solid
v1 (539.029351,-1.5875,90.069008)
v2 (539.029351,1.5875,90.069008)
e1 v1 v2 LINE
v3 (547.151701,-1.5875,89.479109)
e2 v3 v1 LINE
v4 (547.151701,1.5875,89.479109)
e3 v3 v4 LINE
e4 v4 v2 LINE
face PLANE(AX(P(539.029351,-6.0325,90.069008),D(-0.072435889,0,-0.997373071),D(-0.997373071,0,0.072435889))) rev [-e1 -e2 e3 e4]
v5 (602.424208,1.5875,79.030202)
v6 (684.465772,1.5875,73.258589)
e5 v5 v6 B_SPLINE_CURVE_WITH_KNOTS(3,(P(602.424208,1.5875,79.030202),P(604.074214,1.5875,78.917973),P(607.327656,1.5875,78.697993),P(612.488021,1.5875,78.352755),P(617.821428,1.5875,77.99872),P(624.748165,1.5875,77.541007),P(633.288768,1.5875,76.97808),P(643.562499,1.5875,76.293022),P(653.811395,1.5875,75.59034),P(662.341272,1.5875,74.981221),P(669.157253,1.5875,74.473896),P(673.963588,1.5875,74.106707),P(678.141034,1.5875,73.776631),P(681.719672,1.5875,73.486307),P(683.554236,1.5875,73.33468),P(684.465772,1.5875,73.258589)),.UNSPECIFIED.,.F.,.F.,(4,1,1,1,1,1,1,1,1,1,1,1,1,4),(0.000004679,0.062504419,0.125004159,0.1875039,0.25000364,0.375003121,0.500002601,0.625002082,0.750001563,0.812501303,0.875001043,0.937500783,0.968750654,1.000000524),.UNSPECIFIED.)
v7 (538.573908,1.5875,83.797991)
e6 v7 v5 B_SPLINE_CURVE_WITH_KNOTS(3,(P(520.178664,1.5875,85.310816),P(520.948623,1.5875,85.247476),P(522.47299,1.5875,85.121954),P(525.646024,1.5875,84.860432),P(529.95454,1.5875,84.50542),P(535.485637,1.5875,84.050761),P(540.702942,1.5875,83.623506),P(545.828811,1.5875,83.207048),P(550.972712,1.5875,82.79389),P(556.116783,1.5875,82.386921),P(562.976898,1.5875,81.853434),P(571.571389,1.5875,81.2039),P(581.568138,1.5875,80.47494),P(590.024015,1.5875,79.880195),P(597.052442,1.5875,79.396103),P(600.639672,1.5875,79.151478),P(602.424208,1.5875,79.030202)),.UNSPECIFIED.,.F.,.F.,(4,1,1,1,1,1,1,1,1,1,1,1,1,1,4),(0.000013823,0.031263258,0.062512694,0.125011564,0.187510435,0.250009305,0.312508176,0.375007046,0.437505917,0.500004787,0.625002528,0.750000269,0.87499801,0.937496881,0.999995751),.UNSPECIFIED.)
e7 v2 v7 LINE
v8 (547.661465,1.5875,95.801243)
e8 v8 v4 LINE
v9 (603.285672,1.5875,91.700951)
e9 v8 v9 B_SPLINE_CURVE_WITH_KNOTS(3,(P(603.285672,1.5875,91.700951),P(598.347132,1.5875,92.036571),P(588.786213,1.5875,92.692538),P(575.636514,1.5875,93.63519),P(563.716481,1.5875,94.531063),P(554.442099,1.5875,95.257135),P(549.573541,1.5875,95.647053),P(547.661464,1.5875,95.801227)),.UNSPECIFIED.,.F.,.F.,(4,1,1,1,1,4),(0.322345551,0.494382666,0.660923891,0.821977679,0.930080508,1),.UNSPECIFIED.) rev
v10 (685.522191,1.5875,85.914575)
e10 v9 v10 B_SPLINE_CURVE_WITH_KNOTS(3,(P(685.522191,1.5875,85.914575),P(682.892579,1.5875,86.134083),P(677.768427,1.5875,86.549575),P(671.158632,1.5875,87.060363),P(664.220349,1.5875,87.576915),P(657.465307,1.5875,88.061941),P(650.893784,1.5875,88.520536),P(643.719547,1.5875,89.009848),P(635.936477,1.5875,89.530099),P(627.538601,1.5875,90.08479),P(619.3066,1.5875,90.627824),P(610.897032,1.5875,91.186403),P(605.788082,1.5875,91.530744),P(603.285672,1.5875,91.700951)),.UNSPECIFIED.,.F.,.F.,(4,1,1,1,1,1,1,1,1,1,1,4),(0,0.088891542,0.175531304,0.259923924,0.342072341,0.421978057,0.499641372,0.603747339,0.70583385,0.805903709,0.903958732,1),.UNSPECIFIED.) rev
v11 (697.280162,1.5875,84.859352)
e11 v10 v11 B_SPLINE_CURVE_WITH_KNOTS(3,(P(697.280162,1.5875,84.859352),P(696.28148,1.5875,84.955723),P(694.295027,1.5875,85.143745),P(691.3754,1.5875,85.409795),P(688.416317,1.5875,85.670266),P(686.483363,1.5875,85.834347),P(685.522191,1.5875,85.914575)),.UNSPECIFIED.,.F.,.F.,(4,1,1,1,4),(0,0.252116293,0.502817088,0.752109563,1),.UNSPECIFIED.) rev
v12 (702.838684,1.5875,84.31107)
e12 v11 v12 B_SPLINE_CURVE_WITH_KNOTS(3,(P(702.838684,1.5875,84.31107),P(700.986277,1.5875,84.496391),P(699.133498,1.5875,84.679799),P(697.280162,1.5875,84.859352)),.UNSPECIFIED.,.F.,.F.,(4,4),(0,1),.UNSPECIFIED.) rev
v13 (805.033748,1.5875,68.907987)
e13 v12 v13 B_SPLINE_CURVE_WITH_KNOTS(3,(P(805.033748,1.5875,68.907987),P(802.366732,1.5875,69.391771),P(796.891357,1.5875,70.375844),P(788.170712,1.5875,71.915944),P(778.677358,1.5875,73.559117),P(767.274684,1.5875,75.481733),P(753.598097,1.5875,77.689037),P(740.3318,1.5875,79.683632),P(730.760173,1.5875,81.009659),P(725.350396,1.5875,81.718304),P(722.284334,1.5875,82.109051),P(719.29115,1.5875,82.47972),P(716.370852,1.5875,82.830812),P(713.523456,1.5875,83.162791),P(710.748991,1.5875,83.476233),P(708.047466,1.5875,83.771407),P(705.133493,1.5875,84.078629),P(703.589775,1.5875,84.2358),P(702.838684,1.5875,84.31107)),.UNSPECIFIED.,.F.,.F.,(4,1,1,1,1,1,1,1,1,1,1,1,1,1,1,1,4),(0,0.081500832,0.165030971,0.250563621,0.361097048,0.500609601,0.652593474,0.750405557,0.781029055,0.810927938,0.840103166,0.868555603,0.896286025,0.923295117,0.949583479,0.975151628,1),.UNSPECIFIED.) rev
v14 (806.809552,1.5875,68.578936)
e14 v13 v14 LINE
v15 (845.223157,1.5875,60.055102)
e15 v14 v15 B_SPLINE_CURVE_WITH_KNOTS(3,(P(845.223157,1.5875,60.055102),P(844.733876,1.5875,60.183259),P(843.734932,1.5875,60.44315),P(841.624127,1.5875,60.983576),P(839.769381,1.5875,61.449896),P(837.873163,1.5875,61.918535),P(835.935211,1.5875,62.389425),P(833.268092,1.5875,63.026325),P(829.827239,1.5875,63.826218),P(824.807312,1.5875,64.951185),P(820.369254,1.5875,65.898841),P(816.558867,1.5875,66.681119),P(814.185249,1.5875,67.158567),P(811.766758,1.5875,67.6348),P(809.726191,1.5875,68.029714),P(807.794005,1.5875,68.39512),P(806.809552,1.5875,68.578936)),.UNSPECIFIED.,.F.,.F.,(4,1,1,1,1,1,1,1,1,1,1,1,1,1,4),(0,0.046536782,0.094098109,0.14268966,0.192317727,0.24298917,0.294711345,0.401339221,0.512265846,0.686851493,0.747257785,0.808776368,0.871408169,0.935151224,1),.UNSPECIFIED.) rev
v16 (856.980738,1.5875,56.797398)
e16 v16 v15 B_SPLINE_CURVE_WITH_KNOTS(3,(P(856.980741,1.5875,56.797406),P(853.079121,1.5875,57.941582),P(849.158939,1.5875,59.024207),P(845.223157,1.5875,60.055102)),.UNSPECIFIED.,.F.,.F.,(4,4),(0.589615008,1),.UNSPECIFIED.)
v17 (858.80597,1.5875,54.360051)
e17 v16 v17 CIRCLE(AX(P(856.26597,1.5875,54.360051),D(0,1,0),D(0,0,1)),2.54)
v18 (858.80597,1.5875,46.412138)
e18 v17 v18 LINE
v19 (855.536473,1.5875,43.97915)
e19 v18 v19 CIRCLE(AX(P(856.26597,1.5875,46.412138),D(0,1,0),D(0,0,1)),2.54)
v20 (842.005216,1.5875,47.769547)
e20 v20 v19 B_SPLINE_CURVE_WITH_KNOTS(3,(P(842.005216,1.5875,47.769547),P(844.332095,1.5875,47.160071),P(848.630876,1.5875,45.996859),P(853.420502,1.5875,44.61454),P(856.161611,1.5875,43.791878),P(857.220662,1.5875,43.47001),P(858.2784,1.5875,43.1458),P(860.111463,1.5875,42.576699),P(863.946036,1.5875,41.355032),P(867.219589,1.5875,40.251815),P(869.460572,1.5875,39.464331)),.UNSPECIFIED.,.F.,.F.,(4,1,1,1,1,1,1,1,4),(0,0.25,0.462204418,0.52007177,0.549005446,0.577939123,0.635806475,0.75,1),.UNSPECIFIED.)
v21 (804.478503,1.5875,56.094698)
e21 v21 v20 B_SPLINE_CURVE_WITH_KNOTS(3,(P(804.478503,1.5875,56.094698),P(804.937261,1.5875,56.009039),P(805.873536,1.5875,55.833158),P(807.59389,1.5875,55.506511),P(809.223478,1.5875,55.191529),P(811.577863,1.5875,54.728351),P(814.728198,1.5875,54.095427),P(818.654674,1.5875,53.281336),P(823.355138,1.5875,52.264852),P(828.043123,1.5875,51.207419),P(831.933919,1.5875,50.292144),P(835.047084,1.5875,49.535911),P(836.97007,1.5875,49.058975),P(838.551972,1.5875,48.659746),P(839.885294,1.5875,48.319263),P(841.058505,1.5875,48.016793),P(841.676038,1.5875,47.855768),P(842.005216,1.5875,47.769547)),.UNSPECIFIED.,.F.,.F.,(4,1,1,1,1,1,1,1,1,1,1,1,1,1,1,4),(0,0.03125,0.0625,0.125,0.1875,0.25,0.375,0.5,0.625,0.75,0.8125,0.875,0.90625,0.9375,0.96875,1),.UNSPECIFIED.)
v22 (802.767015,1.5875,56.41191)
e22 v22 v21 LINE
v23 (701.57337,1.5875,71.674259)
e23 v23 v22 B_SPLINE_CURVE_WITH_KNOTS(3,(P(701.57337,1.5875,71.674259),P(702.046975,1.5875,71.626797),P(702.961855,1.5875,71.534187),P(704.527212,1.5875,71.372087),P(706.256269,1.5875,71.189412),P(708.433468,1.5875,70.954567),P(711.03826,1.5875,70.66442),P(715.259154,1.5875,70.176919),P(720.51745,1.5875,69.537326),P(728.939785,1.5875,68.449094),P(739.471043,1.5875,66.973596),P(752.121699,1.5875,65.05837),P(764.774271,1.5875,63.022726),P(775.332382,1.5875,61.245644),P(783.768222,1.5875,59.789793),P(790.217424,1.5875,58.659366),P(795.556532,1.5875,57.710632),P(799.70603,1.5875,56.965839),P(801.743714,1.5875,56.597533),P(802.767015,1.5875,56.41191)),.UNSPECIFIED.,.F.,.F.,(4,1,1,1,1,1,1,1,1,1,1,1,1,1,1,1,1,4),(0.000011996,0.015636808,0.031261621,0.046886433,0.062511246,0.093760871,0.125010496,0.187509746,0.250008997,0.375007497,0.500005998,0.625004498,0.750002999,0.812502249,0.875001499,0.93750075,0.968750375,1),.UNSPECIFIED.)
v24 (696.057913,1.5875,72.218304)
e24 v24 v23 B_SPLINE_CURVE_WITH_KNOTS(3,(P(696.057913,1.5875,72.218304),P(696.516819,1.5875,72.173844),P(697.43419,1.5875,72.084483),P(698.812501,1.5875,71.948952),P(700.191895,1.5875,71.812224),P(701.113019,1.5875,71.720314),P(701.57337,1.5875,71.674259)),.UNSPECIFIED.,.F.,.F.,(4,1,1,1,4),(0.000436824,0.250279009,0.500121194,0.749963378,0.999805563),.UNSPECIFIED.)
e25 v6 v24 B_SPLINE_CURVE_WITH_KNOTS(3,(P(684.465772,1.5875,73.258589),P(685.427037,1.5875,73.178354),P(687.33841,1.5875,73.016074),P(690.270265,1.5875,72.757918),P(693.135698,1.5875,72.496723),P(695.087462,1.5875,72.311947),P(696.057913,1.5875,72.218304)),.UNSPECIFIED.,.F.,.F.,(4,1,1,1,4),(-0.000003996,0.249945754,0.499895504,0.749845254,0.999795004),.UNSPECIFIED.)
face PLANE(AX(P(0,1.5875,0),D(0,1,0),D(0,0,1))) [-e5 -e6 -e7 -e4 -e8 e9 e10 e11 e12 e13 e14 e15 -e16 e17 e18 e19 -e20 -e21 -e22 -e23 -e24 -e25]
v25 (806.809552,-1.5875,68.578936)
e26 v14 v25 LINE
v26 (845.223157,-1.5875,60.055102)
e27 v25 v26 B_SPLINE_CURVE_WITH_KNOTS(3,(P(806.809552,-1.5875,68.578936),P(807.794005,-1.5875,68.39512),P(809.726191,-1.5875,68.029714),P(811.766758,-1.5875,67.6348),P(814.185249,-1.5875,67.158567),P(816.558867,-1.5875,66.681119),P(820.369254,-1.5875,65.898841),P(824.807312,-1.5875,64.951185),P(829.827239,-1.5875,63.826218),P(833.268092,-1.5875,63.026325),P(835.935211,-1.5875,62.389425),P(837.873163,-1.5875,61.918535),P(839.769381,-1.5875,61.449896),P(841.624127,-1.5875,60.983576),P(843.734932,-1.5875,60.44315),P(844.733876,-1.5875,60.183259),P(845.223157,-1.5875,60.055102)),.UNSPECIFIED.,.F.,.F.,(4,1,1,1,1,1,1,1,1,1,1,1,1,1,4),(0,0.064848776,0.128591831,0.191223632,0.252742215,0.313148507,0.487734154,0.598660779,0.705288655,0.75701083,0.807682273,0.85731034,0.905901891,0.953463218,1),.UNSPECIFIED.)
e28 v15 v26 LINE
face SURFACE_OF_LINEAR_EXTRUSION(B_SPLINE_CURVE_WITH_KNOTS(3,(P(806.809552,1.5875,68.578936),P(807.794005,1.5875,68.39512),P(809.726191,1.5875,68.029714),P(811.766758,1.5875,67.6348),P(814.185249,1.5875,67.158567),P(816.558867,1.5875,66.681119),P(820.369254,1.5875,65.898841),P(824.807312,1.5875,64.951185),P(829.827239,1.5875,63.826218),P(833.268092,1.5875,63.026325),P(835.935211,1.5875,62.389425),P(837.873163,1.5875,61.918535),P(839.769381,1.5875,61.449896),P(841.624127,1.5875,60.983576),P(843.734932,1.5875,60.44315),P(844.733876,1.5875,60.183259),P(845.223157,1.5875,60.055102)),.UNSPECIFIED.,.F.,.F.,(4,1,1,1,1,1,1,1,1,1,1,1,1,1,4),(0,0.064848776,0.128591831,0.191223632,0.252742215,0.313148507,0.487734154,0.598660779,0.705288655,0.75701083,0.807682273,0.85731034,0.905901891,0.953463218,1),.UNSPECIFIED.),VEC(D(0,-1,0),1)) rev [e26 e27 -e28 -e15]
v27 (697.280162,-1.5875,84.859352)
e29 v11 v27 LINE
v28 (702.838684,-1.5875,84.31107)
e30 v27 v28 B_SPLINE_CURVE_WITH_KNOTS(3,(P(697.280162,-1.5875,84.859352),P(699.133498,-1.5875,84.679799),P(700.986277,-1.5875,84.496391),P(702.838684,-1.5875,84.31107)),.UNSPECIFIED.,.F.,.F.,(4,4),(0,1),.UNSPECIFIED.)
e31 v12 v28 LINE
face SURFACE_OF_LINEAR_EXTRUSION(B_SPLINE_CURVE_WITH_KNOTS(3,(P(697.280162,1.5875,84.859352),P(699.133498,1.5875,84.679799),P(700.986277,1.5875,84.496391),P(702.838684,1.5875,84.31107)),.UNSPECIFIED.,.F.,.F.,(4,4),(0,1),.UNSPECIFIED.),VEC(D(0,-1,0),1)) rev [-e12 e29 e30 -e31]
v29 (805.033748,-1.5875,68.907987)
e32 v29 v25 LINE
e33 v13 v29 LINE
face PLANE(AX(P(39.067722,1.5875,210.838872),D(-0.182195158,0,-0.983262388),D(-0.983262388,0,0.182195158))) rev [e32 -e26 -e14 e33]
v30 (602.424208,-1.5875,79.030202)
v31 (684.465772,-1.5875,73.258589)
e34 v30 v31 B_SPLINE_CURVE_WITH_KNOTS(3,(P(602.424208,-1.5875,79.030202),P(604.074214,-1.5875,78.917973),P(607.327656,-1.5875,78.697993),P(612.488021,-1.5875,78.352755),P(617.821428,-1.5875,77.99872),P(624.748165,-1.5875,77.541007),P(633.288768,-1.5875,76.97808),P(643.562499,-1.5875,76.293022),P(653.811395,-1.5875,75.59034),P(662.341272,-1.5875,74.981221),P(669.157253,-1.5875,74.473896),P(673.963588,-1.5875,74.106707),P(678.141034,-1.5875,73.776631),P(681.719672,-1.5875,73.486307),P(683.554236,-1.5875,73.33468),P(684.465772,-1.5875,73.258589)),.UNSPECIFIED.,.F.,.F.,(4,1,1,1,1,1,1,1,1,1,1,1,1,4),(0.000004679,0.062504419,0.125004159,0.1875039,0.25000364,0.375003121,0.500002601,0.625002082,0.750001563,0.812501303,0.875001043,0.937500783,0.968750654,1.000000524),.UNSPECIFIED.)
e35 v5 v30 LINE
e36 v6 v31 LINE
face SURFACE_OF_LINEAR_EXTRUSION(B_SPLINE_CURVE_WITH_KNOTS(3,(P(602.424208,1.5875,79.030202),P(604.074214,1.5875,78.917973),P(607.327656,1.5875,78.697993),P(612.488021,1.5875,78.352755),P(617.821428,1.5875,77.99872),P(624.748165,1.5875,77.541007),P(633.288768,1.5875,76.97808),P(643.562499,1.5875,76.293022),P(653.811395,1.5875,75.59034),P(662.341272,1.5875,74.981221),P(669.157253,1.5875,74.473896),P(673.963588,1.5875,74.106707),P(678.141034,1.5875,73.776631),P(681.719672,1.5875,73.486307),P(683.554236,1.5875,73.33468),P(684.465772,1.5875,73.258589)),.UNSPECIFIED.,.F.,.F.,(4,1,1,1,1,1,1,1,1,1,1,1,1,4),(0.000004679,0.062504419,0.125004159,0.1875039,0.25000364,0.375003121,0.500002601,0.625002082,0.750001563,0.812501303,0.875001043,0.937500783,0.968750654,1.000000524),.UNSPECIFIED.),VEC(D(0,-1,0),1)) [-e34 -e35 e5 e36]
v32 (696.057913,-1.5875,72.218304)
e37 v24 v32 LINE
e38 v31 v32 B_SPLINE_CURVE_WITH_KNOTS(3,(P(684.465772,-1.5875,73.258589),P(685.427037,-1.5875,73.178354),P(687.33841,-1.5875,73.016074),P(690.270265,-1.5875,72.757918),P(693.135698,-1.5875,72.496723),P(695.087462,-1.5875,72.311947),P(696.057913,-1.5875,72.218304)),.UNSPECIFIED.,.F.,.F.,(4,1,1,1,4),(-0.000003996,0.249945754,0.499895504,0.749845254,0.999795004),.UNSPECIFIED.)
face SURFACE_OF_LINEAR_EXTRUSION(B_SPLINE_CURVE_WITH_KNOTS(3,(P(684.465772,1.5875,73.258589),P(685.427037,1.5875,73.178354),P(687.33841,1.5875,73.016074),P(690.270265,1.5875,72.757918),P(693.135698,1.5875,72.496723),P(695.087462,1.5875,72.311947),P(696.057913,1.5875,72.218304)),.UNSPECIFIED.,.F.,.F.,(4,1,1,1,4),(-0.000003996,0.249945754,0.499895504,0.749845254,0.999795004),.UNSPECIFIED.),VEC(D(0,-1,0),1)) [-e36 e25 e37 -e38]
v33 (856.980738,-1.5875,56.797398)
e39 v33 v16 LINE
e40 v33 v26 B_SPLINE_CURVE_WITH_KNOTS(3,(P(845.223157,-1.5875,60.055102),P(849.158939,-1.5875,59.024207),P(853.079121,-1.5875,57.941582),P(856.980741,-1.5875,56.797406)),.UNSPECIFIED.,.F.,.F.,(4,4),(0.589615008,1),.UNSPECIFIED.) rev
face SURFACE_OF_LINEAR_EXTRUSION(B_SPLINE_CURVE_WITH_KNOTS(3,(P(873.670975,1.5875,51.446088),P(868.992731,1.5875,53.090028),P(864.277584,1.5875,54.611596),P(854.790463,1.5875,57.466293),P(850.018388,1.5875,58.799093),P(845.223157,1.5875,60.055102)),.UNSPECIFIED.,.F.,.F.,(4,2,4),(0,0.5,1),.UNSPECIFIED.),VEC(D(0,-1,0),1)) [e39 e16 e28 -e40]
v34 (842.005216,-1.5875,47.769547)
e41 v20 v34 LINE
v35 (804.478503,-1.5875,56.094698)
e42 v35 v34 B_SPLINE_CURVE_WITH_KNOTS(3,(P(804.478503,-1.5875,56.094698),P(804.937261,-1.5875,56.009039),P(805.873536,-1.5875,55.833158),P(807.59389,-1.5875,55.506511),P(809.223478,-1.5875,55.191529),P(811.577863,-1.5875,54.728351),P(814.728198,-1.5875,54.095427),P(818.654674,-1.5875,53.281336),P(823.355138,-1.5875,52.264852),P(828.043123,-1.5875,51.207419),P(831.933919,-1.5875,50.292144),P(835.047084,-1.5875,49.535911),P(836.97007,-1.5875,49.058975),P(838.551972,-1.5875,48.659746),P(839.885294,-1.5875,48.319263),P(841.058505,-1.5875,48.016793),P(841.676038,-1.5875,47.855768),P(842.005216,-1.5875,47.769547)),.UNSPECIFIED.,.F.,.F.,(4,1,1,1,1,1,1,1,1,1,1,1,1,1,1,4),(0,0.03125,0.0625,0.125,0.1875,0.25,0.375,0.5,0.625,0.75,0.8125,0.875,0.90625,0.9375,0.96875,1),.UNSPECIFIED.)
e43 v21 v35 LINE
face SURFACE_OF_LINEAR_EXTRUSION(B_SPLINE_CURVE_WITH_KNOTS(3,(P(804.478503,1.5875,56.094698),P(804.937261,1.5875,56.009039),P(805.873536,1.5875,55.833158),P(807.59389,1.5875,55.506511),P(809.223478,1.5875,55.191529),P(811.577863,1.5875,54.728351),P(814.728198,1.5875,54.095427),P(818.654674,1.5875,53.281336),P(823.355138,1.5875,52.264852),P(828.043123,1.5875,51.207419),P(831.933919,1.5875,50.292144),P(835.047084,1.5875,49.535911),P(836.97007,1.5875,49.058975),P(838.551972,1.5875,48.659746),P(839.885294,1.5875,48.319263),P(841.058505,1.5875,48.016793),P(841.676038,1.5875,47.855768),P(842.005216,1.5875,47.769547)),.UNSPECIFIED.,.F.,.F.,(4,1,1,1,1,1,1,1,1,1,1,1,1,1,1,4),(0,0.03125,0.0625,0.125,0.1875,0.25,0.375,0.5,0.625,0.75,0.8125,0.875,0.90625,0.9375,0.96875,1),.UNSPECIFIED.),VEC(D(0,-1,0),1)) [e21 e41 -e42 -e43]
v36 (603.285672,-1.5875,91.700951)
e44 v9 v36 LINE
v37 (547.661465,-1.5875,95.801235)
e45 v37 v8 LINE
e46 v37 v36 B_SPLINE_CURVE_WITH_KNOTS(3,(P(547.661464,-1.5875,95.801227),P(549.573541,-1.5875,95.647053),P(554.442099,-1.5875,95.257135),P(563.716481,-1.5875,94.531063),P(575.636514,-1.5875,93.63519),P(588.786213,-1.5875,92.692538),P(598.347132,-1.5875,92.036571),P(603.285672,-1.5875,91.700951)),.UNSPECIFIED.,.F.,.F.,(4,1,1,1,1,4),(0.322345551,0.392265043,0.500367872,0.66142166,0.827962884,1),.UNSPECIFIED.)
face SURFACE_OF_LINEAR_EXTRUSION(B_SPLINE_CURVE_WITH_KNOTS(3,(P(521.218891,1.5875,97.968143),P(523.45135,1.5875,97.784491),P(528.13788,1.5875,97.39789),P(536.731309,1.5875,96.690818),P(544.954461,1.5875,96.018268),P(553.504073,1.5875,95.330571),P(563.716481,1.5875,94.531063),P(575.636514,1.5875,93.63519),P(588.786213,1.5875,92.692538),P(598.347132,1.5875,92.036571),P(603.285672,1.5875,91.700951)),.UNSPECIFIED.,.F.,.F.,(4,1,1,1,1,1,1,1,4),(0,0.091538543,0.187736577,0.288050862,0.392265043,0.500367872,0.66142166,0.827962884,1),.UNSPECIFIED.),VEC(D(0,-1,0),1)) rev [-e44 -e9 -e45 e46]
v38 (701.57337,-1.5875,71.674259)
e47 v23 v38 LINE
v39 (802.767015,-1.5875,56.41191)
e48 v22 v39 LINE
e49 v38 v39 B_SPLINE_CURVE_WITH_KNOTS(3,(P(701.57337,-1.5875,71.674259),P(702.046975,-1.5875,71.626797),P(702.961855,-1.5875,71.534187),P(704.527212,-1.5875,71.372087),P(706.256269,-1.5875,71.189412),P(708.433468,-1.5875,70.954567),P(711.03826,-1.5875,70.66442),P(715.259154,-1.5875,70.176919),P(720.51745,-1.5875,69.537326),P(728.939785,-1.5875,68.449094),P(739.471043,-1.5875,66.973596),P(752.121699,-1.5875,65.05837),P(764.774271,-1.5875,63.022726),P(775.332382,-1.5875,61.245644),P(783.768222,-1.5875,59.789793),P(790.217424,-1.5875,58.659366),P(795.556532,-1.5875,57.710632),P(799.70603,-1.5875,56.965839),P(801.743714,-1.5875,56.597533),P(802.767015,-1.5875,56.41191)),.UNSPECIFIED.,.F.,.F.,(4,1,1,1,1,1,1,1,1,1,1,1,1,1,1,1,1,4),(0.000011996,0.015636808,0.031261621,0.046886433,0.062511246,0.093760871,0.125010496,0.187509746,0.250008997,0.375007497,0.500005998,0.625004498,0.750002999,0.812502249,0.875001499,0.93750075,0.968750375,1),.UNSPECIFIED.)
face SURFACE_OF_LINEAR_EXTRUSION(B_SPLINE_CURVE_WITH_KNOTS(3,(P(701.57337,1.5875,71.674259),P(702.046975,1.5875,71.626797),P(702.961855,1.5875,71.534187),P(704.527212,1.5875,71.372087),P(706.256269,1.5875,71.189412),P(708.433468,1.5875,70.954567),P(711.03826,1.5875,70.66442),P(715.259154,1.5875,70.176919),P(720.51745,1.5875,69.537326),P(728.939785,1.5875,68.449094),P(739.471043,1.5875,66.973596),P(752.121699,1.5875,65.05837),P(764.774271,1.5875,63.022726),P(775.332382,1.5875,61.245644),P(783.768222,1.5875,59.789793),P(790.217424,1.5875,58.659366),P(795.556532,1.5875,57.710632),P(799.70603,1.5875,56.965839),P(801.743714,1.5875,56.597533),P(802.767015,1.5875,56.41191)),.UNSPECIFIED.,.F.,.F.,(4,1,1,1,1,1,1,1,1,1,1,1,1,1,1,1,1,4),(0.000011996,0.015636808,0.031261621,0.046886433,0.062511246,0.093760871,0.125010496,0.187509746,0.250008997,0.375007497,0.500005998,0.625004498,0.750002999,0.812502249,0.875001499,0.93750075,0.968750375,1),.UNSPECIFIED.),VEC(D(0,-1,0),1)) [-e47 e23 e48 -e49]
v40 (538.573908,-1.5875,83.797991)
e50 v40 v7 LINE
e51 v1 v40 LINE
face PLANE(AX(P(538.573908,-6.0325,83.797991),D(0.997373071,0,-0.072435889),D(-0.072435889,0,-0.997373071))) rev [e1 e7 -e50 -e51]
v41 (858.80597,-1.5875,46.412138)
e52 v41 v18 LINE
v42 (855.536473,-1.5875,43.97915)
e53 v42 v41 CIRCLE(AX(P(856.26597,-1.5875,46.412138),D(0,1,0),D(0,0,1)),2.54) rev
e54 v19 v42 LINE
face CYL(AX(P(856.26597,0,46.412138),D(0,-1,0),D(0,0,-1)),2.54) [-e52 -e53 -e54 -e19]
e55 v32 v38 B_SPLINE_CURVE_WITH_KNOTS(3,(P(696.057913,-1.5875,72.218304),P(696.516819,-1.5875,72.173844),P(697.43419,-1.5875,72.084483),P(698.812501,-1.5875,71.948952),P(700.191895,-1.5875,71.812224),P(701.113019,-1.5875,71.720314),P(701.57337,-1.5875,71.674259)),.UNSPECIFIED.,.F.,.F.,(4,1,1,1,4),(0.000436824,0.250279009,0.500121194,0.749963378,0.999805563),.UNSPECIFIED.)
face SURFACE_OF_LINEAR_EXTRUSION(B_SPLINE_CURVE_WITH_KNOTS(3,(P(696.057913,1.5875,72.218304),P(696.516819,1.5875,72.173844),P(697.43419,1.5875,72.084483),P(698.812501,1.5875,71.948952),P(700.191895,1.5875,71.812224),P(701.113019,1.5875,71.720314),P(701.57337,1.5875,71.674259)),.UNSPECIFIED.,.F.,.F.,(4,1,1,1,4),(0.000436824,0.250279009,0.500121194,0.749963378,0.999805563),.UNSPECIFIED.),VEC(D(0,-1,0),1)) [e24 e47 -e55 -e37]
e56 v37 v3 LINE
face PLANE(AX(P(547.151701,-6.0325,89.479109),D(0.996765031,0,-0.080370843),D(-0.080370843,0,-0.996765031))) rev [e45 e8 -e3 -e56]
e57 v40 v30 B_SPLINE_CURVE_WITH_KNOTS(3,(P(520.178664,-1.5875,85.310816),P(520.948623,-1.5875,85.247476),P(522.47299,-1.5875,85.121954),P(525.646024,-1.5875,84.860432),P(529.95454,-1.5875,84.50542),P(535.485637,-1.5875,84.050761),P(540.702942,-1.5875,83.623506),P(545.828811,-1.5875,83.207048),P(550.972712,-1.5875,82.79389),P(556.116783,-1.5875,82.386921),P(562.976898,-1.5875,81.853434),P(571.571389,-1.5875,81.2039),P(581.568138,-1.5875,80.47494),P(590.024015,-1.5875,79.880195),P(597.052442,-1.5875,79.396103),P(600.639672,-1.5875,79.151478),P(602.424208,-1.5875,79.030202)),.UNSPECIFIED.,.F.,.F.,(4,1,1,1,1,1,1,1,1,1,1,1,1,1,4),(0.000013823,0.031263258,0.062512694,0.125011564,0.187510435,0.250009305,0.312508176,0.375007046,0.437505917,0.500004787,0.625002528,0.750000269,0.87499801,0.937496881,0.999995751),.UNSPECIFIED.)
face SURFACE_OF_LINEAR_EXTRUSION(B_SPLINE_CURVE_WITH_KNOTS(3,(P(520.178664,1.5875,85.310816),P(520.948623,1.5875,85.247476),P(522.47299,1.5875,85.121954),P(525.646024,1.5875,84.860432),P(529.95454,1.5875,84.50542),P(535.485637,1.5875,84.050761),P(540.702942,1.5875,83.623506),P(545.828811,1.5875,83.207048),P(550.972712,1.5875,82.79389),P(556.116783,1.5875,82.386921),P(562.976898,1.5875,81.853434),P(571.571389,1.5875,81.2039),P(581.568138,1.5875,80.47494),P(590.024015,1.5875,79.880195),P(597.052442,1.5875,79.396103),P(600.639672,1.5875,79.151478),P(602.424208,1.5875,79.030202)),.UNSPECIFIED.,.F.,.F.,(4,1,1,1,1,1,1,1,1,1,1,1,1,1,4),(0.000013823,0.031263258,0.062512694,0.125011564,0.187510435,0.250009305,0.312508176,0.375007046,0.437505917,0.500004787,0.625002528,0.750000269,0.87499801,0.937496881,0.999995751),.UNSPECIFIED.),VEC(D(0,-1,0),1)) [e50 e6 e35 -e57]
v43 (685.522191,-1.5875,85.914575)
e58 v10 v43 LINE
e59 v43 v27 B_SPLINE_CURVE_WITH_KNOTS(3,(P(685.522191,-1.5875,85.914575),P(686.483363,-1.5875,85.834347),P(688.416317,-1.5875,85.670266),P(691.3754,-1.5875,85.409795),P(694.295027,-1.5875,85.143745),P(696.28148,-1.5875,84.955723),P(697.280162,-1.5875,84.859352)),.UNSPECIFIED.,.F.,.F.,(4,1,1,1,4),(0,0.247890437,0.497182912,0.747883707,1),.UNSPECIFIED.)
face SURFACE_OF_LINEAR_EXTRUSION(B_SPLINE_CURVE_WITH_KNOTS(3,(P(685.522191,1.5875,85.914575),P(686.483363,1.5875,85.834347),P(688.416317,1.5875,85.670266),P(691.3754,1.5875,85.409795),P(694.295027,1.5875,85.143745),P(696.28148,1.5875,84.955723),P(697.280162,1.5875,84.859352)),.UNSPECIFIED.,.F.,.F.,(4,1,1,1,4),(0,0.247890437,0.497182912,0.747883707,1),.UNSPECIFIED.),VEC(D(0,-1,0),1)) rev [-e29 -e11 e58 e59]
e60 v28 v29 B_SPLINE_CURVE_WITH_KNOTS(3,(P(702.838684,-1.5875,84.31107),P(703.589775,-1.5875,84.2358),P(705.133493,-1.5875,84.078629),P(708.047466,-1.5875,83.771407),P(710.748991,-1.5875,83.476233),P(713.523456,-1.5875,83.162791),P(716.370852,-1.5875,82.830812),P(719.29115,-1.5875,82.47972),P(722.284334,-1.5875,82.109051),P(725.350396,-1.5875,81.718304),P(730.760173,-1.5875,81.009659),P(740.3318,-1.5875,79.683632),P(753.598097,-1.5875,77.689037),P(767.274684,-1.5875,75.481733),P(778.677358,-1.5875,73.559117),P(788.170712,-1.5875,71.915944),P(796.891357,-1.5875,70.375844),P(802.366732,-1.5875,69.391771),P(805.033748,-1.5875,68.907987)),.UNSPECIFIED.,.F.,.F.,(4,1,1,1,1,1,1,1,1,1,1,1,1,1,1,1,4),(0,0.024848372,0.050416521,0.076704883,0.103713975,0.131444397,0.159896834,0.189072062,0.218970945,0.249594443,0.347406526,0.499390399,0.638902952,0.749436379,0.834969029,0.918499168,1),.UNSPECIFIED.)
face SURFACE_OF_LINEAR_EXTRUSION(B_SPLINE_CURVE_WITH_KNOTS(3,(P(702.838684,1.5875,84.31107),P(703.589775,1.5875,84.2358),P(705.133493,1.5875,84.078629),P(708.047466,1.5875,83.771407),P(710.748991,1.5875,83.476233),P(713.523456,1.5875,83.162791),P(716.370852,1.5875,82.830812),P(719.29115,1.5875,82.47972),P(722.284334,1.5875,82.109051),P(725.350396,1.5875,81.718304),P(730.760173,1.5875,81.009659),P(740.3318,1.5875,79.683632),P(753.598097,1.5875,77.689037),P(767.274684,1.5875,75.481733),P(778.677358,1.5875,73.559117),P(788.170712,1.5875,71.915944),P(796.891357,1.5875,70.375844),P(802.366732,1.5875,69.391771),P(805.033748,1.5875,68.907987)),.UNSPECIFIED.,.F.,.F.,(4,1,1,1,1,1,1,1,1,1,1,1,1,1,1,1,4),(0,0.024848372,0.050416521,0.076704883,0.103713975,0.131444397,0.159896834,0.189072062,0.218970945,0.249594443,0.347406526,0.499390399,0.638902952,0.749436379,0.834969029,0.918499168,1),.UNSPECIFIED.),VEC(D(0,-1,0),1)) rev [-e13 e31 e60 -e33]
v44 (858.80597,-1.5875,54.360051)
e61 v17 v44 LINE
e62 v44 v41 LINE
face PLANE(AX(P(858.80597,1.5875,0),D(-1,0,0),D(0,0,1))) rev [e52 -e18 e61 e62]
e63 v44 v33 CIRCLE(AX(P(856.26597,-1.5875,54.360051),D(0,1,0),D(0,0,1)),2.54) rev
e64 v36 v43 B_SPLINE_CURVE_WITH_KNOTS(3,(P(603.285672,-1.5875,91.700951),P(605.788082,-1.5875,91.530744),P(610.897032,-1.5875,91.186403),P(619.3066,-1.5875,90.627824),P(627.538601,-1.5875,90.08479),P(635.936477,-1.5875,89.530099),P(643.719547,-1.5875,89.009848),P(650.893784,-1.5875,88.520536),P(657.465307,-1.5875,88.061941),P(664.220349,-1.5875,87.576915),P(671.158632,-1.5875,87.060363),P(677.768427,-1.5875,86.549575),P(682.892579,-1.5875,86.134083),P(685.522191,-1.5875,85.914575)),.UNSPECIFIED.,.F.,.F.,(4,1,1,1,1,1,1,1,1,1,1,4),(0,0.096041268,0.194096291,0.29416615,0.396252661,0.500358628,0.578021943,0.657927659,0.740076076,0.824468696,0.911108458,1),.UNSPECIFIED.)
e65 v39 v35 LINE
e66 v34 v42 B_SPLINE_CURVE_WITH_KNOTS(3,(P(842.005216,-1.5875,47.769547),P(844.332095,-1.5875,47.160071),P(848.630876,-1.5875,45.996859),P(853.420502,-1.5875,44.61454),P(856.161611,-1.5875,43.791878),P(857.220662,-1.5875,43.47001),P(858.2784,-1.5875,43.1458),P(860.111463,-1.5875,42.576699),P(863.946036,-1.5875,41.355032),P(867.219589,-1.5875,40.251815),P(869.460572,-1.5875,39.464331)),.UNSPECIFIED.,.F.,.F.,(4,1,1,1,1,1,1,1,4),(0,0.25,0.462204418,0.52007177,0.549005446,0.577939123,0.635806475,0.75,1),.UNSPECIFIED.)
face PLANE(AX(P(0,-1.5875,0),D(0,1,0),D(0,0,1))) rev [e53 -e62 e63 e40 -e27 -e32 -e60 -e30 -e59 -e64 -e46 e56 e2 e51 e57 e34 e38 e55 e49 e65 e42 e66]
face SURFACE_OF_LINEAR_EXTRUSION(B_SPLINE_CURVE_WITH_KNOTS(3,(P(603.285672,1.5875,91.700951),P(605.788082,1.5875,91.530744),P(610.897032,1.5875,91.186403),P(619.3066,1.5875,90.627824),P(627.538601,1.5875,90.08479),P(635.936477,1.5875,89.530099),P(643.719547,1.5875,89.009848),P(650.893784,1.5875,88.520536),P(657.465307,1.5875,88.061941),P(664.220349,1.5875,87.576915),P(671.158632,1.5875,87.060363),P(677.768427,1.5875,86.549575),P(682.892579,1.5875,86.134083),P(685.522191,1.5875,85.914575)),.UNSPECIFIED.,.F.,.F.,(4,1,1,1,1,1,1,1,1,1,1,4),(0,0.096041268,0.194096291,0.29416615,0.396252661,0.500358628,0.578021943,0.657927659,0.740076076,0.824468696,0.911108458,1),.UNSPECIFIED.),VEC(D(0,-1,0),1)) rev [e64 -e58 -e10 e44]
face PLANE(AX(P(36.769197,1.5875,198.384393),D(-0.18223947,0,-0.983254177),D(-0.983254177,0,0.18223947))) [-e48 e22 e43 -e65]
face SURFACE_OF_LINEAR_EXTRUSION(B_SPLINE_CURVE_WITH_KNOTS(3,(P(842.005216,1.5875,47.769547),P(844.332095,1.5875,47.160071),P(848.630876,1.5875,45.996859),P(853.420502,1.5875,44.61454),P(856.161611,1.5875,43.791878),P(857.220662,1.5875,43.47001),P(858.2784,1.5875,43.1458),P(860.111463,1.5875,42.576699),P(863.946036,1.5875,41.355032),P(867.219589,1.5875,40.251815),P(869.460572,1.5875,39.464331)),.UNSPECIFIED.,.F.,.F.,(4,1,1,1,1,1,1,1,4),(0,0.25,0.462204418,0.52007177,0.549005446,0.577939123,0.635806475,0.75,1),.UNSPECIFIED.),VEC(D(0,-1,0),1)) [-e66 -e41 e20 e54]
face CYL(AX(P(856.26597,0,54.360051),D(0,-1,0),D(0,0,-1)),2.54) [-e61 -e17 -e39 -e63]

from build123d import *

# Parameters (mm, degrees)
BOSS_EXTRUDE1_START = -1.5875
BOSS_EXTRUDE1_DEPTH = 3.175
FILLET1_R           = 2.54
CUT_EXTRUDE1_DEPTH  = 7.62


# Read off the part's stored shape, not the designer's step: Boss-Extrude1
with BuildPart() as part:
    # Boss-Extrude1 outline → Boss-Extrude1 (new body)
    with BuildSketch(Plane(origin=(0, 0, 0), x_dir=(1, 0, 0), z_dir=(0, 1, 0)).offset(BOSS_EXTRUDE1_START)):
        with BuildLine():
            add(Edge.make_bspline(
                [(701.573370465, -71.674259434), (702.04697488, -71.626796619), (702.961854911, -71.534187022), (704.527211696, -71.372087014), (706.256268563, -71.189411511), (708.433468196, -70.954566837), (711.038260137, -70.66442021), (715.259153852, -70.176918919), (720.517449562, -69.537326192), (728.939784684, -68.449094171), (739.471043309, -66.973596397), (752.121699379, -65.058370184), (764.774270693, -63.022725712), (775.332382372, -61.245644149), (783.768221701, -59.789793136), (790.217423582, -58.659365862), (795.556531692, -57.710632329), (799.706029598, -56.965839367), (801.743713725, -56.597532565), (802.76701547, -56.411910209)],
                knots=[1.1996e-05, 1.1996e-05, 1.1996e-05, 1.1996e-05, 0.015636808, 0.031261621, 0.046886433, 0.062511246, 0.093760871, 0.125010496, 0.187509746, 0.250008997, 0.375007497, 0.500005998, 0.625004498, 0.750002999, 0.812502249, 0.875001499, 0.93750075, 0.968750375, 1, 1, 1, 1], degree=3))
            add(Edge.make_bspline(
                [(696.057912544, -72.218303811), (696.516819195, -72.173843609), (697.434189716, -72.08448281), (698.812500771, -71.948951554), (700.191895387, -71.812223809), (701.113019016, -71.720314305), (701.573370465, -71.674259434)],
                knots=[0.000436824, 0.000436824, 0.000436824, 0.000436824, 0.250279009, 0.500121194, 0.749963378, 0.999805563, 0.999805563, 0.999805563, 0.999805563], degree=3))
            add(Edge.make_bspline(
                [(684.465771861, -73.258588893), (685.427037387, -73.178353817), (687.338409796, -73.01607439), (690.270265001, -72.757917882), (693.135698373, -72.496722872), (695.087462196, -72.311946881), (696.057912544, -72.218303811)],
                knots=[-3.996e-06, -3.996e-06, -3.996e-06, -3.996e-06, 0.249945754, 0.499895504, 0.749845254, 0.999795004, 0.999795004, 0.999795004, 0.999795004], degree=3))
            add(Edge.make_bspline(
                [(602.42420841, -79.030202072), (604.074214061, -78.917973041), (607.327656264, -78.697993222), (612.488020924, -78.352754528), (617.82142797, -77.998720132), (624.748165187, -77.541006681), (633.288768179, -76.978079707), (643.562499486, -76.293021789), (653.811394813, -75.590339748), (662.341271598, -74.981221252), (669.157253218, -74.473896148), (673.963588211, -74.106706625), (678.141033863, -73.776630779), (681.719672317, -73.486306526), (683.554235836, -73.334679882), (684.465771861, -73.258588893)],
                knots=[4.679e-06, 4.679e-06, 4.679e-06, 4.679e-06, 0.062504419, 0.125004159, 0.1875039, 0.25000364, 0.375003121, 0.500002601, 0.625002082, 0.750001563, 0.812501303, 0.875001043, 0.937500783, 0.968750654, 1.000000524, 1.000000524, 1.000000524, 1.000000524], degree=3))
            add(Edge.make_bspline(
                [(520.17866376, -85.310815783), (520.948622537, -85.247475703), (522.472990474, -85.121954498), (525.646023872, -84.860432492), (529.954540392, -84.505420462), (535.485636827, -84.050761487), (540.7029418, -83.623505808), (545.828810606, -83.207047886), (550.972711882, -82.793890253), (556.116782859, -82.386921041), (562.976897794, -81.853433898), (571.571389273, -81.203899916), (581.568137842, -80.474939815), (590.024015055, -79.880194977), (597.052441707, -79.396103056), (600.639671821, -79.151478022), (602.42420841, -79.030202072)],
                knots=[1.3823e-05, 1.3823e-05, 1.3823e-05, 1.3823e-05, 0.031263258, 0.062512694, 0.125011564, 0.187510435, 0.250009305, 0.312508176, 0.375007046, 0.437505917, 0.500004787, 0.625002528, 0.750000269, 0.87499801, 0.937496881, 0.999995751, 0.999995751, 0.999995751, 0.999995751], degree=3))
            add(Edge.make_bspline(
                [(421.564796931, -90.347249187), (422.61109619, -90.324190198), (424.721066812, -90.275643156), (427.781390104, -90.199626606), (430.822063258, -90.118782847), (434.941029322, -90.002532976), (440.08484045, -89.844168641), (452.427619866, -89.421521336), (466.822115937, -88.804267378), (483.25535308, -87.910089241), (493.52068453, -87.276342604), (501.726177762, -86.718361924), (507.872215251, -86.275368153), (512.780927318, -85.902800926), (516.950869137, -85.573515025), (519.108912611, -85.398645627), (520.17866376, -85.310815783)],
                knots=[7.203e-06, 7.203e-06, 7.203e-06, 7.203e-06, 0.031256675, 0.062506146, 0.093755618, 0.125005089, 0.187504032, 0.250002975, 0.499998747, 0.624996633, 0.749994519, 0.812493462, 0.874992405, 0.937491348, 0.968740819, 0.999990291, 0.999990291, 0.999990291, 0.999990291], degree=3))
            add(Edge.make_bspline(
                [(346.714675087, -91.169822314), (347.184634959, -91.179549272), (348.149283989, -91.198362445), (349.881001429, -91.228640124), (351.370820969, -91.250109563), (353.638345707, -91.276445536), (356.741777131, -91.30289862), (360.603346067, -91.318288447), (365.253131479, -91.312388009), (369.910166762, -91.284169995), (376.135587827, -91.222367993), (383.937832745, -91.109503558), (391.757720532, -90.96544109), (398.23665113, -90.836219907), (403.230594411, -90.734014325), (408.182903858, -90.630969164), (412.914025095, -90.531986169), (416.611599734, -90.454119205), (419.474951766, -90.392792196), (420.864689854, -90.36259776), (421.564796931, -90.347249187)],
                knots=[1.1e-08, 1.1e-08, 1.1e-08, 1.1e-08, 0.015624829, 0.031249657, 0.062499315, 0.093748972, 0.12499863, 0.187497945, 0.24999726, 0.312496575, 0.37499589, 0.49999452, 0.62499315, 0.687492464, 0.749991779, 0.812491094, 0.874990409, 0.937489724, 0.968739382, 0.999989039, 0.999989039, 0.999989039, 0.999989039], degree=3))
            add(Edge.make_bspline(
                [(284.660180705, -86.02436228), (285.273667186, -86.114656759), (286.466569449, -86.288293963), (288.463107874, -86.571590524), (290.46491743, -86.848444068), (293.02699573, -87.19252046), (296.252166304, -87.606710304), (301.400962421, -88.226261718), (307.844767088, -88.921476193), (315.590478493, -89.626291032), (322.05207179, -90.106744711), (327.225920355, -90.425587153), (330.470644664, -90.599377294), (333.059733967, -90.723413499), (335.02192621, -90.809363102), (336.835778016, -90.883623075), (338.1694462, -90.935956115), (339.489700776, -90.98142965), (341.397886756, -91.039617592), (343.443225624, -91.094945655), (345.255837503, -91.138480537), (346.23440638, -91.159881953), (346.714675087, -91.169822314)],
                knots=[0, 0, 0, 0, 0.03125, 0.0625, 0.09375, 0.125, 0.1875, 0.25, 0.375, 0.5, 0.625, 0.6875, 0.75, 0.78125, 0.8125, 0.84375, 0.875, 0.90625, 0.9375, 0.96875, 0.984375, 1, 1, 1, 1], degree=3))
            add(Edge.make_bspline(
                [(258.083552795, -81.475395447), (258.347968296, -81.526862936), (258.876883054, -81.629439687), (259.670508063, -81.782232521), (260.729004783, -81.984533344), (265.19336261, -82.828339408), (273.252215122, -84.264018509), (280.795301047, -85.455519597), (284.660180705, -86.02436228)],
                knots=[0.425011658, 0.425011658, 0.425011658, 0.425011658, 0.442241189, 0.459470721, 0.476700252, 0.511159315, 0.75, 1, 1, 1, 1], degree=3))
            Line((258.083552795, -81.475395447), (258.083552795, -94.40861288))
            add(Edge.make_bspline(
                [(282.810885884, -98.588999508), (274.906267762, -97.425577983), (267.032082315, -96.096692803), (258.818160589, -94.548151889), (258.450825612, -94.478551371), (258.083552795, -94.40861288)],
                knots=[0, 0, 0, 0, 0.5, 0.5, 0.523411439, 0.523411439, 0.523411439, 0.523411439], degree=3))
            add(Edge.make_bspline(
                [(282.810885884, -98.588999508), (283.589001764, -98.703524555), (285.164508504, -98.932181064), (287.829592849, -99.306686744), (290.382113422, -99.652796041), (292.96654593, -99.989964246), (295.582618612, -100.317621114), (298.230083081, -100.634886778), (300.908649594, -100.941019762), (303.61800528, -101.235303734), (306.357810596, -101.517085869), (309.127700691, -101.785780175), (311.92729165, -102.040857239), (316.290106771, -102.412643883), (322.527800913, -102.877083333), (328.625603501, -103.227822262), (333.380129051, -103.452212237), (336.816790701, -103.594408746), (339.260438836, -103.686034081), (343.688375923, -103.809905452), (346.451873128, -103.867102934)],
                knots=[0, 0, 0, 0, 0.039344948, 0.07917436, 0.119484401, 0.160271019, 0.201529957, 0.243256752, 0.285446746, 0.328095093, 0.37119677, 0.414746584, 0.458739194, 0.503169123, 0.620303495, 0.752369719, 0.789892337, 0.843756099, 0.913843268, 1, 1, 1, 1], degree=3))
            add(Edge.make_bspline(
                [(346.451873128, -103.867102934), (347.517721695, -103.889163254), (349.542313965, -103.92559437), (351.410670783, -103.951601003), (353.733077388, -103.97802022), (356.595805361, -104.001616052), (359.303450326, -104.013254143), (361.856652408, -104.015647305), (363.59855953, -104.013876583), (367.980988834, -104.00146953), (374.772600805, -103.943346872), (385.553908564, -103.787153573), (397.279033824, -103.561287268), (410.957604412, -103.27591363), (418.412993695, -103.119398813), (421.843885938, -103.044182276)],
                knots=[0, 0, 0, 0, 0.033933195, 0.066295354, 0.097094988, 0.12634023, 0.180197875, 0.204824218, 0.227923989, 0.249502809, 0.379187752, 0.498147003, 0.678500622, 0.845778388, 1, 1, 1, 1], degree=3))
            add(Edge.make_bspline(
                [(421.843885938, -103.044182276), (423.284501257, -103.01243375), (426.138074601, -102.945774905), (430.23392379, -102.840101392), (434.371968877, -102.72425222), (439.798819101, -102.559925422), (448.025157593, -102.283759658), (459.021003941, -101.848637215), (471.45249354, -101.271082202), (483.913686147, -100.593406887), (494.231772367, -99.956980278), (502.466387344, -99.39745886), (508.578998405, -98.957752379), (514.573610191, -98.503827918), (518.958126171, -98.153760061), (521.218891036, -97.968142841)],
                knots=[0, 0, 0, 0, 0.042442699, 0.084473439, 0.126075796, 0.167232557, 0.248140272, 0.374197286, 0.498957981, 0.623287397, 0.750390596, 0.810583593, 0.872090979, 0.935130561, 1, 1, 1, 1], degree=3))
            add(Edge.make_bspline(
                [(521.218891036, -97.968142841), (523.451350188, -97.784491424), (528.137879673, -97.397889698), (536.731309482, -96.690817555), (544.954460679, -96.018267543), (553.50407331, -95.33057133), (563.716480518, -94.531063336), (575.636513939, -93.635190253), (588.786212869, -92.692538058), (598.347131864, -92.036570917), (603.285671904, -91.700951094)],
                knots=[0, 0, 0, 0, 0.091538543, 0.187736577, 0.288050862, 0.392265043, 0.500367872, 0.66142166, 0.827962884, 1, 1, 1, 1], degree=3))
            add(Edge.make_bspline(
                [(603.285671904, -91.700951094), (605.78808228, -91.530743591), (610.897032353, -91.186403467), (619.306599861, -90.627823918), (627.538601032, -90.084789882), (635.936476676, -89.530098998), (643.719546666, -89.009847824), (650.893783861, -88.520535985), (657.46530725, -88.061941255), (664.220349455, -87.576914876), (671.158631923, -87.060362733), (677.768426526, -86.549575155), (682.892578542, -86.13408317), (685.522190682, -85.9145748)],
                knots=[0, 0, 0, 0, 0.096041268, 0.194096291, 0.29416615, 0.396252661, 0.500358628, 0.578021943, 0.657927659, 0.740076076, 0.824468696, 0.911108458, 1, 1, 1, 1], degree=3))
            add(Edge.make_bspline(
                [(685.522190682, -85.9145748), (686.483363358, -85.834347474), (688.416317483, -85.670266195), (691.375399642, -85.409794673), (694.295027309, -85.143745348), (696.281480154, -84.95572275), (697.280162315, -84.859352478)],
                knots=[0, 0, 0, 0, 0.247890437, 0.497182912, 0.747883707, 1, 1, 1, 1], degree=3))
            add(Edge.make_bspline(
                [(697.280162315, -84.859352478), (699.133498258, -84.679799353), (700.986276607, -84.496390936), (702.838684367, -84.311070025)],
                knots=[0, 0, 0, 0, 1, 1, 1, 1], degree=3))
            add(Edge.make_bspline(
                [(702.838684367, -84.311070025), (703.589775295, -84.235799752), (705.133492987, -84.078629058), (708.047466313, -83.771407142), (710.748991263, -83.476233306), (713.523455705, -83.162791229), (716.37085234, -82.830812164), (719.291149506, -82.479719712), (722.284334057, -82.109050619), (725.350396028, -81.718303946), (730.760173437, -81.009658613), (740.331799838, -79.683632118), (753.598097399, -77.68903736), (767.27468421, -75.481732644), (778.677358422, -73.559116698), (788.170711893, -71.915943965), (796.891357387, -70.375844053), (802.366731643, -69.391771369), (805.033747795, -68.907986576)],
                knots=[0, 0, 0, 0, 0.024848372, 0.050416521, 0.076704883, 0.103713975, 0.131444397, 0.159896834, 0.189072062, 0.218970945, 0.249594443, 0.347406526, 0.499390399, 0.638902952, 0.749436379, 0.834969029, 0.918499168, 1, 1, 1, 1], degree=3))
            Line((805.033747795, -68.907986576), (806.809551789, -68.578936168))
            add(Edge.make_bspline(
                [(806.809551789, -68.578936168), (807.794004822, -68.395119755), (809.726191369, -68.029713589), (811.766757719, -67.634799792), (814.185248792, -67.158567155), (816.55886725, -66.68111941), (820.369254046, -65.898841142), (824.807312319, -64.951185469), (829.827239229, -63.826217582), (833.268092373, -63.026324522), (835.935211118, -62.389425037), (837.873162846, -61.91853539), (839.769381429, -61.449895816), (841.624127129, -60.983575945), (843.734931971, -60.443149682), (844.733875611, -60.183258894), (845.223156672, -60.055102096)],
                knots=[0, 0, 0, 0, 0.064848776, 0.128591831, 0.191223632, 0.252742215, 0.313148507, 0.487734154, 0.598660779, 0.705288655, 0.75701083, 0.807682273, 0.85731034, 0.905901891, 0.953463218, 1, 1, 1, 1], degree=3))
            add(Edge.make_bspline(
                [(858.805970467, -56.257210913), (854.302265416, -57.602424975), (849.773135735, -58.863331563), (845.223156672, -60.055102096)],
                knots=[0.525572557, 0.525572557, 0.525572557, 0.525572557, 1, 1, 1, 1], degree=3))
            Line((858.805970467, -56.257210913), (858.805970467, -42.981654463))
            add(Edge.make_bspline(
                [(842.005216089, -47.769547229), (844.33209519, -47.160070589), (848.630876213, -45.996859499), (853.420502494, -44.614540459), (856.161610787, -43.791878163), (857.220661541, -43.470009626), (858.013965236, -43.226852548), (858.542087125, -43.063586295), (858.805970467, -42.981654463)],
                knots=[0, 0, 0, 0, 0.25, 0.462204418, 0.52007177, 0.549005446, 0.577939123, 0.606872799, 0.606872799, 0.606872799, 0.606872799], degree=3))
            add(Edge.make_bspline(
                [(804.478503109, -56.094697623), (804.937261418, -56.009038578), (805.873535899, -55.833158182), (807.593890186, -55.506511486), (809.223478159, -55.191529302), (811.577863033, -54.728351346), (814.728198308, -54.095426794), (818.65467417, -53.281335813), (823.355137668, -52.264852214), (828.043123472, -51.207419322), (831.9339187, -50.292144023), (835.047083584, -49.53591133), (836.970069876, -49.058975401), (838.551971708, -48.659746263), (839.885294081, -48.319263071), (841.0585054, -48.016793361), (841.676038434, -47.855768334), (842.005216089, -47.769547229)],
                knots=[0, 0, 0, 0, 0.03125, 0.0625, 0.125, 0.1875, 0.25, 0.375, 0.5, 0.625, 0.75, 0.8125, 0.875, 0.90625, 0.9375, 0.96875, 1, 1, 1, 1], degree=3))
            Line((804.478503109, -56.094697623), (802.76701547, -56.411910209))
        make_face()
    extrude(amount=BOSS_EXTRUDE1_DEPTH)

    # Fillet1
    fillet1_edges = [part.edges().sort_by_distance(p)[0] for p in [
        (858.805970467, 0, 42.981654463),
        (858.805970467, 0, 56.257210913),
        (258.083552795, 0, 81.475395447),
        (258.083552795, 0, 94.40861288),
    ]]
    fillet(fillet1_edges, radius=FILLET1_R)

    # Sketch3 → Cut-Extrude1 (cut)
    with BuildSketch(Plane(origin=(0, 1.5875, 0), x_dir=(1, 0, 0), z_dir=(0, 1, 0))):
        with BuildLine():
            Line((538.573908081, -83.797990994), (539.029351184, -90.069007907))
            Line((539.029351184, -90.069007907), (547.151700891, -89.47910866))
            Line((547.151700891, -89.47910866), (547.661463933, -95.801226886))
            add(Edge.make_bspline(
                [(521.218891036, -97.968142841), (523.451350188, -97.784491424), (528.137879673, -97.397889698), (536.731309482, -96.690817555), (543.042562143, -96.17463672), (546.723612796, -95.876847403), (547.661463933, -95.801226886)],
                knots=[0, 0, 0, 0, 0.091538543, 0.187736577, 0.288050862, 0.322345551, 0.322345551, 0.322345551, 0.322345551], degree=3))
            add(Edge.make_bspline(
                [(421.843885938, -103.044182276), (423.284501257, -103.01243375), (426.138074601, -102.945774905), (430.23392379, -102.840101392), (434.371968877, -102.72425222), (439.798819101, -102.559925422), (448.025157593, -102.283759658), (459.021003941, -101.848637215), (471.45249354, -101.271082202), (483.913686147, -100.593406887), (494.231772367, -99.956980278), (502.466387344, -99.39745886), (508.578998405, -98.957752379), (514.573610191, -98.503827918), (518.958126171, -98.153760061), (521.218891036, -97.968142841)],
                knots=[0, 0, 0, 0, 0.042442699, 0.084473439, 0.126075796, 0.167232557, 0.248140272, 0.374197286, 0.498957981, 0.623287397, 0.750390596, 0.810583593, 0.872090979, 0.935130561, 1, 1, 1, 1], degree=3))
            add(Edge.make_bspline(
                [(346.451873128, -103.867102934), (347.517721695, -103.889163254), (349.542313965, -103.92559437), (351.410670783, -103.951601003), (353.733077388, -103.97802022), (356.595805361, -104.001616052), (359.303450326, -104.013254143), (361.856652408, -104.015647305), (363.59855953, -104.013876583), (367.980988834, -104.00146953), (374.772600805, -103.943346872), (385.553908564, -103.787153573), (397.279033824, -103.561287268), (410.957604412, -103.27591363), (418.412993695, -103.119398813), (421.843885938, -103.044182276)],
                knots=[0, 0, 0, 0, 0.033933195, 0.066295354, 0.097094988, 0.12634023, 0.180197875, 0.204824218, 0.227923989, 0.249502809, 0.379187752, 0.498147003, 0.678500622, 0.845778388, 1, 1, 1, 1], degree=3))
            add(Edge.make_bspline(
                [(282.810885884, -98.588999508), (283.589001764, -98.703524555), (285.164508504, -98.932181064), (287.829592849, -99.306686744), (290.382113422, -99.652796041), (292.96654593, -99.989964246), (295.582618612, -100.317621114), (298.230083081, -100.634886778), (300.908649594, -100.941019762), (303.61800528, -101.235303734), (306.357810596, -101.517085869), (309.127700691, -101.785780175), (311.92729165, -102.040857239), (316.290106771, -102.412643883), (322.527800913, -102.877083333), (328.625603501, -103.227822262), (333.380129051, -103.452212237), (336.816790701, -103.594408746), (339.260438836, -103.686034081), (343.688375923, -103.809905452), (346.451873128, -103.867102934)],
                knots=[0, 0, 0, 0, 0.039344948, 0.07917436, 0.119484401, 0.160271019, 0.201529957, 0.243256752, 0.285446746, 0.328095093, 0.37119677, 0.414746584, 0.458739194, 0.503169123, 0.620303495, 0.752369719, 0.789892337, 0.843756099, 0.913843268, 1, 1, 1, 1], degree=3))
            add(Edge.make_bspline(
                [(260.156933678, -94.799777019), (267.681906669, -96.206087709), (275.23240977, -97.473589286), (282.810885884, -98.588999508)],
                knots=[0, 0, 0, 0, 0.479370069, 0.479370069, 0.479370069, 0.479370069], degree=3))
            ThreePointArc((260.156933678, -94.799777019), (258.66947298, -93.925704756), (258.083552795, -92.302978906))
            Line((258.083552795, -92.302978906), (258.083552795, -84.549365422))
            ThreePointArc((258.083552795, -84.549365422), (259.00311997, -82.593400837), (261.09599174, -82.053688872))
            add(Edge.make_bspline(
                [(284.660180705, -86.02436228), (280.795301047, -85.455519597), (273.252215122, -84.264018509), (265.404390098, -82.865933811), (261.414911279, -82.114061283), (261.09599174, -82.053688872)],
                knots=[0.490403274, 0.490403274, 0.490403274, 0.490403274, 0.740403274, 0.979243959, 1, 1, 1, 1], degree=3))
            add(Edge.make_bspline(
                [(346.714674129, -91.169822295), (346.23440638, -91.159881953), (345.255837503, -91.138480537), (343.443225624, -91.094945655), (341.397886756, -91.039617592), (339.489700776, -90.98142965), (338.1694462, -90.935956115), (336.835778016, -90.883623075), (335.02192621, -90.809363102), (333.059733967, -90.723413499), (330.470644664, -90.599377294), (327.225920355, -90.425587153), (322.05207179, -90.106744711), (315.590478493, -89.626291032), (307.844767088, -88.921476193), (301.400962421, -88.226261718), (296.252166304, -87.606710304), (293.02699573, -87.19252046), (290.46491743, -86.848444068), (288.463107874, -86.571590524), (286.466569449, -86.288293963), (285.273667186, -86.114656759), (284.660180705, -86.02436228)],
                knots=[2.1e-08, 2.1e-08, 2.1e-08, 2.1e-08, 0.015625, 0.03125, 0.0625, 0.09375, 0.125, 0.15625, 0.1875, 0.21875, 0.25, 0.3125, 0.375, 0.5, 0.625, 0.75, 0.8125, 0.875, 0.90625, 0.9375, 0.96875, 1, 1, 1, 1], degree=3))
            add(Edge.make_bspline(
                [(421.564796931, -90.347249187), (420.864689854, -90.36259776), (419.474951766, -90.392792196), (416.611599734, -90.454119205), (412.914025095, -90.531986169), (408.182903858, -90.630969164), (403.230594411, -90.734014325), (398.23665113, -90.836219907), (391.757720532, -90.96544109), (383.937832745, -91.109503558), (376.135587827, -91.222367993), (369.910166762, -91.284169995), (365.253131479, -91.312388009), (360.603346067, -91.318288447), (356.741777131, -91.30289862), (353.638345707, -91.276445536), (351.370820969, -91.250109563), (349.881001429, -91.228640124), (348.149283695, -91.19836244), (347.184634303, -91.17954926), (346.714674129, -91.169822295)],
                knots=[0, 0, 0, 0, 0.031249657, 0.062499315, 0.12499863, 0.187497945, 0.24999726, 0.312496575, 0.37499589, 0.49999452, 0.62499315, 0.687492464, 0.749991779, 0.812491094, 0.874990409, 0.906240067, 0.937489724, 0.968739382, 0.984364211, 0.999989039, 0.999989039, 0.999989039, 0.999989039], degree=3))
            add(Edge.make_bspline(
                [(520.17866376, -85.310815783), (519.108912611, -85.398645627), (516.950869137, -85.573515025), (512.780927318, -85.902800926), (507.872215251, -86.275368153), (501.726177762, -86.718361924), (493.52068453, -87.276342604), (483.25535308, -87.910089241), (466.822115937, -88.804267378), (452.427619866, -89.421521336), (440.08484045, -89.844168641), (434.941029322, -90.002532976), (430.822063258, -90.118782847), (427.781390104, -90.199626606), (424.721066812, -90.275643156), (422.61109619, -90.324190198), (421.564796931, -90.347249187)],
                knots=[7.203e-06, 7.203e-06, 7.203e-06, 7.203e-06, 0.031256675, 0.062506146, 0.125005089, 0.187504032, 0.250002975, 0.375000861, 0.499998747, 0.749994519, 0.812493462, 0.874992405, 0.906241876, 0.937491348, 0.968740819, 0.999990291, 0.999990291, 0.999990291, 0.999990291], degree=3))
            add(Edge.make_bspline(
                [(538.573908081, -83.797990994), (537.540297953, -83.882548181), (534.735644037, -84.112411281), (529.954540392, -84.505420462), (525.646023872, -84.860432492), (522.472990474, -85.121954498), (520.948622537, -85.247475703), (520.17866376, -85.310815783)],
                knots=[0.775424, 0.775424, 0.775424, 0.775424, 0.81249914, 0.87499801, 0.937496881, 0.968746316, 0.999995751, 0.999995751, 0.999995751, 0.999995751], degree=3))
        make_face()
    extrude(amount=-CUT_EXTRUDE1_DEPTH, mode=Mode.SUBTRACT)


with BuildPart() as cut_extrude1_kept_piece:
    # of the separate pieces the step leaves, the one the design keeps (cut_extrude1_pieces_kept)
    add(part.part.solids().sort_by_distance((855.536472896, -1.5875, 43.979149832))[0])


solid = cut_extrude1_kept_piece.part
